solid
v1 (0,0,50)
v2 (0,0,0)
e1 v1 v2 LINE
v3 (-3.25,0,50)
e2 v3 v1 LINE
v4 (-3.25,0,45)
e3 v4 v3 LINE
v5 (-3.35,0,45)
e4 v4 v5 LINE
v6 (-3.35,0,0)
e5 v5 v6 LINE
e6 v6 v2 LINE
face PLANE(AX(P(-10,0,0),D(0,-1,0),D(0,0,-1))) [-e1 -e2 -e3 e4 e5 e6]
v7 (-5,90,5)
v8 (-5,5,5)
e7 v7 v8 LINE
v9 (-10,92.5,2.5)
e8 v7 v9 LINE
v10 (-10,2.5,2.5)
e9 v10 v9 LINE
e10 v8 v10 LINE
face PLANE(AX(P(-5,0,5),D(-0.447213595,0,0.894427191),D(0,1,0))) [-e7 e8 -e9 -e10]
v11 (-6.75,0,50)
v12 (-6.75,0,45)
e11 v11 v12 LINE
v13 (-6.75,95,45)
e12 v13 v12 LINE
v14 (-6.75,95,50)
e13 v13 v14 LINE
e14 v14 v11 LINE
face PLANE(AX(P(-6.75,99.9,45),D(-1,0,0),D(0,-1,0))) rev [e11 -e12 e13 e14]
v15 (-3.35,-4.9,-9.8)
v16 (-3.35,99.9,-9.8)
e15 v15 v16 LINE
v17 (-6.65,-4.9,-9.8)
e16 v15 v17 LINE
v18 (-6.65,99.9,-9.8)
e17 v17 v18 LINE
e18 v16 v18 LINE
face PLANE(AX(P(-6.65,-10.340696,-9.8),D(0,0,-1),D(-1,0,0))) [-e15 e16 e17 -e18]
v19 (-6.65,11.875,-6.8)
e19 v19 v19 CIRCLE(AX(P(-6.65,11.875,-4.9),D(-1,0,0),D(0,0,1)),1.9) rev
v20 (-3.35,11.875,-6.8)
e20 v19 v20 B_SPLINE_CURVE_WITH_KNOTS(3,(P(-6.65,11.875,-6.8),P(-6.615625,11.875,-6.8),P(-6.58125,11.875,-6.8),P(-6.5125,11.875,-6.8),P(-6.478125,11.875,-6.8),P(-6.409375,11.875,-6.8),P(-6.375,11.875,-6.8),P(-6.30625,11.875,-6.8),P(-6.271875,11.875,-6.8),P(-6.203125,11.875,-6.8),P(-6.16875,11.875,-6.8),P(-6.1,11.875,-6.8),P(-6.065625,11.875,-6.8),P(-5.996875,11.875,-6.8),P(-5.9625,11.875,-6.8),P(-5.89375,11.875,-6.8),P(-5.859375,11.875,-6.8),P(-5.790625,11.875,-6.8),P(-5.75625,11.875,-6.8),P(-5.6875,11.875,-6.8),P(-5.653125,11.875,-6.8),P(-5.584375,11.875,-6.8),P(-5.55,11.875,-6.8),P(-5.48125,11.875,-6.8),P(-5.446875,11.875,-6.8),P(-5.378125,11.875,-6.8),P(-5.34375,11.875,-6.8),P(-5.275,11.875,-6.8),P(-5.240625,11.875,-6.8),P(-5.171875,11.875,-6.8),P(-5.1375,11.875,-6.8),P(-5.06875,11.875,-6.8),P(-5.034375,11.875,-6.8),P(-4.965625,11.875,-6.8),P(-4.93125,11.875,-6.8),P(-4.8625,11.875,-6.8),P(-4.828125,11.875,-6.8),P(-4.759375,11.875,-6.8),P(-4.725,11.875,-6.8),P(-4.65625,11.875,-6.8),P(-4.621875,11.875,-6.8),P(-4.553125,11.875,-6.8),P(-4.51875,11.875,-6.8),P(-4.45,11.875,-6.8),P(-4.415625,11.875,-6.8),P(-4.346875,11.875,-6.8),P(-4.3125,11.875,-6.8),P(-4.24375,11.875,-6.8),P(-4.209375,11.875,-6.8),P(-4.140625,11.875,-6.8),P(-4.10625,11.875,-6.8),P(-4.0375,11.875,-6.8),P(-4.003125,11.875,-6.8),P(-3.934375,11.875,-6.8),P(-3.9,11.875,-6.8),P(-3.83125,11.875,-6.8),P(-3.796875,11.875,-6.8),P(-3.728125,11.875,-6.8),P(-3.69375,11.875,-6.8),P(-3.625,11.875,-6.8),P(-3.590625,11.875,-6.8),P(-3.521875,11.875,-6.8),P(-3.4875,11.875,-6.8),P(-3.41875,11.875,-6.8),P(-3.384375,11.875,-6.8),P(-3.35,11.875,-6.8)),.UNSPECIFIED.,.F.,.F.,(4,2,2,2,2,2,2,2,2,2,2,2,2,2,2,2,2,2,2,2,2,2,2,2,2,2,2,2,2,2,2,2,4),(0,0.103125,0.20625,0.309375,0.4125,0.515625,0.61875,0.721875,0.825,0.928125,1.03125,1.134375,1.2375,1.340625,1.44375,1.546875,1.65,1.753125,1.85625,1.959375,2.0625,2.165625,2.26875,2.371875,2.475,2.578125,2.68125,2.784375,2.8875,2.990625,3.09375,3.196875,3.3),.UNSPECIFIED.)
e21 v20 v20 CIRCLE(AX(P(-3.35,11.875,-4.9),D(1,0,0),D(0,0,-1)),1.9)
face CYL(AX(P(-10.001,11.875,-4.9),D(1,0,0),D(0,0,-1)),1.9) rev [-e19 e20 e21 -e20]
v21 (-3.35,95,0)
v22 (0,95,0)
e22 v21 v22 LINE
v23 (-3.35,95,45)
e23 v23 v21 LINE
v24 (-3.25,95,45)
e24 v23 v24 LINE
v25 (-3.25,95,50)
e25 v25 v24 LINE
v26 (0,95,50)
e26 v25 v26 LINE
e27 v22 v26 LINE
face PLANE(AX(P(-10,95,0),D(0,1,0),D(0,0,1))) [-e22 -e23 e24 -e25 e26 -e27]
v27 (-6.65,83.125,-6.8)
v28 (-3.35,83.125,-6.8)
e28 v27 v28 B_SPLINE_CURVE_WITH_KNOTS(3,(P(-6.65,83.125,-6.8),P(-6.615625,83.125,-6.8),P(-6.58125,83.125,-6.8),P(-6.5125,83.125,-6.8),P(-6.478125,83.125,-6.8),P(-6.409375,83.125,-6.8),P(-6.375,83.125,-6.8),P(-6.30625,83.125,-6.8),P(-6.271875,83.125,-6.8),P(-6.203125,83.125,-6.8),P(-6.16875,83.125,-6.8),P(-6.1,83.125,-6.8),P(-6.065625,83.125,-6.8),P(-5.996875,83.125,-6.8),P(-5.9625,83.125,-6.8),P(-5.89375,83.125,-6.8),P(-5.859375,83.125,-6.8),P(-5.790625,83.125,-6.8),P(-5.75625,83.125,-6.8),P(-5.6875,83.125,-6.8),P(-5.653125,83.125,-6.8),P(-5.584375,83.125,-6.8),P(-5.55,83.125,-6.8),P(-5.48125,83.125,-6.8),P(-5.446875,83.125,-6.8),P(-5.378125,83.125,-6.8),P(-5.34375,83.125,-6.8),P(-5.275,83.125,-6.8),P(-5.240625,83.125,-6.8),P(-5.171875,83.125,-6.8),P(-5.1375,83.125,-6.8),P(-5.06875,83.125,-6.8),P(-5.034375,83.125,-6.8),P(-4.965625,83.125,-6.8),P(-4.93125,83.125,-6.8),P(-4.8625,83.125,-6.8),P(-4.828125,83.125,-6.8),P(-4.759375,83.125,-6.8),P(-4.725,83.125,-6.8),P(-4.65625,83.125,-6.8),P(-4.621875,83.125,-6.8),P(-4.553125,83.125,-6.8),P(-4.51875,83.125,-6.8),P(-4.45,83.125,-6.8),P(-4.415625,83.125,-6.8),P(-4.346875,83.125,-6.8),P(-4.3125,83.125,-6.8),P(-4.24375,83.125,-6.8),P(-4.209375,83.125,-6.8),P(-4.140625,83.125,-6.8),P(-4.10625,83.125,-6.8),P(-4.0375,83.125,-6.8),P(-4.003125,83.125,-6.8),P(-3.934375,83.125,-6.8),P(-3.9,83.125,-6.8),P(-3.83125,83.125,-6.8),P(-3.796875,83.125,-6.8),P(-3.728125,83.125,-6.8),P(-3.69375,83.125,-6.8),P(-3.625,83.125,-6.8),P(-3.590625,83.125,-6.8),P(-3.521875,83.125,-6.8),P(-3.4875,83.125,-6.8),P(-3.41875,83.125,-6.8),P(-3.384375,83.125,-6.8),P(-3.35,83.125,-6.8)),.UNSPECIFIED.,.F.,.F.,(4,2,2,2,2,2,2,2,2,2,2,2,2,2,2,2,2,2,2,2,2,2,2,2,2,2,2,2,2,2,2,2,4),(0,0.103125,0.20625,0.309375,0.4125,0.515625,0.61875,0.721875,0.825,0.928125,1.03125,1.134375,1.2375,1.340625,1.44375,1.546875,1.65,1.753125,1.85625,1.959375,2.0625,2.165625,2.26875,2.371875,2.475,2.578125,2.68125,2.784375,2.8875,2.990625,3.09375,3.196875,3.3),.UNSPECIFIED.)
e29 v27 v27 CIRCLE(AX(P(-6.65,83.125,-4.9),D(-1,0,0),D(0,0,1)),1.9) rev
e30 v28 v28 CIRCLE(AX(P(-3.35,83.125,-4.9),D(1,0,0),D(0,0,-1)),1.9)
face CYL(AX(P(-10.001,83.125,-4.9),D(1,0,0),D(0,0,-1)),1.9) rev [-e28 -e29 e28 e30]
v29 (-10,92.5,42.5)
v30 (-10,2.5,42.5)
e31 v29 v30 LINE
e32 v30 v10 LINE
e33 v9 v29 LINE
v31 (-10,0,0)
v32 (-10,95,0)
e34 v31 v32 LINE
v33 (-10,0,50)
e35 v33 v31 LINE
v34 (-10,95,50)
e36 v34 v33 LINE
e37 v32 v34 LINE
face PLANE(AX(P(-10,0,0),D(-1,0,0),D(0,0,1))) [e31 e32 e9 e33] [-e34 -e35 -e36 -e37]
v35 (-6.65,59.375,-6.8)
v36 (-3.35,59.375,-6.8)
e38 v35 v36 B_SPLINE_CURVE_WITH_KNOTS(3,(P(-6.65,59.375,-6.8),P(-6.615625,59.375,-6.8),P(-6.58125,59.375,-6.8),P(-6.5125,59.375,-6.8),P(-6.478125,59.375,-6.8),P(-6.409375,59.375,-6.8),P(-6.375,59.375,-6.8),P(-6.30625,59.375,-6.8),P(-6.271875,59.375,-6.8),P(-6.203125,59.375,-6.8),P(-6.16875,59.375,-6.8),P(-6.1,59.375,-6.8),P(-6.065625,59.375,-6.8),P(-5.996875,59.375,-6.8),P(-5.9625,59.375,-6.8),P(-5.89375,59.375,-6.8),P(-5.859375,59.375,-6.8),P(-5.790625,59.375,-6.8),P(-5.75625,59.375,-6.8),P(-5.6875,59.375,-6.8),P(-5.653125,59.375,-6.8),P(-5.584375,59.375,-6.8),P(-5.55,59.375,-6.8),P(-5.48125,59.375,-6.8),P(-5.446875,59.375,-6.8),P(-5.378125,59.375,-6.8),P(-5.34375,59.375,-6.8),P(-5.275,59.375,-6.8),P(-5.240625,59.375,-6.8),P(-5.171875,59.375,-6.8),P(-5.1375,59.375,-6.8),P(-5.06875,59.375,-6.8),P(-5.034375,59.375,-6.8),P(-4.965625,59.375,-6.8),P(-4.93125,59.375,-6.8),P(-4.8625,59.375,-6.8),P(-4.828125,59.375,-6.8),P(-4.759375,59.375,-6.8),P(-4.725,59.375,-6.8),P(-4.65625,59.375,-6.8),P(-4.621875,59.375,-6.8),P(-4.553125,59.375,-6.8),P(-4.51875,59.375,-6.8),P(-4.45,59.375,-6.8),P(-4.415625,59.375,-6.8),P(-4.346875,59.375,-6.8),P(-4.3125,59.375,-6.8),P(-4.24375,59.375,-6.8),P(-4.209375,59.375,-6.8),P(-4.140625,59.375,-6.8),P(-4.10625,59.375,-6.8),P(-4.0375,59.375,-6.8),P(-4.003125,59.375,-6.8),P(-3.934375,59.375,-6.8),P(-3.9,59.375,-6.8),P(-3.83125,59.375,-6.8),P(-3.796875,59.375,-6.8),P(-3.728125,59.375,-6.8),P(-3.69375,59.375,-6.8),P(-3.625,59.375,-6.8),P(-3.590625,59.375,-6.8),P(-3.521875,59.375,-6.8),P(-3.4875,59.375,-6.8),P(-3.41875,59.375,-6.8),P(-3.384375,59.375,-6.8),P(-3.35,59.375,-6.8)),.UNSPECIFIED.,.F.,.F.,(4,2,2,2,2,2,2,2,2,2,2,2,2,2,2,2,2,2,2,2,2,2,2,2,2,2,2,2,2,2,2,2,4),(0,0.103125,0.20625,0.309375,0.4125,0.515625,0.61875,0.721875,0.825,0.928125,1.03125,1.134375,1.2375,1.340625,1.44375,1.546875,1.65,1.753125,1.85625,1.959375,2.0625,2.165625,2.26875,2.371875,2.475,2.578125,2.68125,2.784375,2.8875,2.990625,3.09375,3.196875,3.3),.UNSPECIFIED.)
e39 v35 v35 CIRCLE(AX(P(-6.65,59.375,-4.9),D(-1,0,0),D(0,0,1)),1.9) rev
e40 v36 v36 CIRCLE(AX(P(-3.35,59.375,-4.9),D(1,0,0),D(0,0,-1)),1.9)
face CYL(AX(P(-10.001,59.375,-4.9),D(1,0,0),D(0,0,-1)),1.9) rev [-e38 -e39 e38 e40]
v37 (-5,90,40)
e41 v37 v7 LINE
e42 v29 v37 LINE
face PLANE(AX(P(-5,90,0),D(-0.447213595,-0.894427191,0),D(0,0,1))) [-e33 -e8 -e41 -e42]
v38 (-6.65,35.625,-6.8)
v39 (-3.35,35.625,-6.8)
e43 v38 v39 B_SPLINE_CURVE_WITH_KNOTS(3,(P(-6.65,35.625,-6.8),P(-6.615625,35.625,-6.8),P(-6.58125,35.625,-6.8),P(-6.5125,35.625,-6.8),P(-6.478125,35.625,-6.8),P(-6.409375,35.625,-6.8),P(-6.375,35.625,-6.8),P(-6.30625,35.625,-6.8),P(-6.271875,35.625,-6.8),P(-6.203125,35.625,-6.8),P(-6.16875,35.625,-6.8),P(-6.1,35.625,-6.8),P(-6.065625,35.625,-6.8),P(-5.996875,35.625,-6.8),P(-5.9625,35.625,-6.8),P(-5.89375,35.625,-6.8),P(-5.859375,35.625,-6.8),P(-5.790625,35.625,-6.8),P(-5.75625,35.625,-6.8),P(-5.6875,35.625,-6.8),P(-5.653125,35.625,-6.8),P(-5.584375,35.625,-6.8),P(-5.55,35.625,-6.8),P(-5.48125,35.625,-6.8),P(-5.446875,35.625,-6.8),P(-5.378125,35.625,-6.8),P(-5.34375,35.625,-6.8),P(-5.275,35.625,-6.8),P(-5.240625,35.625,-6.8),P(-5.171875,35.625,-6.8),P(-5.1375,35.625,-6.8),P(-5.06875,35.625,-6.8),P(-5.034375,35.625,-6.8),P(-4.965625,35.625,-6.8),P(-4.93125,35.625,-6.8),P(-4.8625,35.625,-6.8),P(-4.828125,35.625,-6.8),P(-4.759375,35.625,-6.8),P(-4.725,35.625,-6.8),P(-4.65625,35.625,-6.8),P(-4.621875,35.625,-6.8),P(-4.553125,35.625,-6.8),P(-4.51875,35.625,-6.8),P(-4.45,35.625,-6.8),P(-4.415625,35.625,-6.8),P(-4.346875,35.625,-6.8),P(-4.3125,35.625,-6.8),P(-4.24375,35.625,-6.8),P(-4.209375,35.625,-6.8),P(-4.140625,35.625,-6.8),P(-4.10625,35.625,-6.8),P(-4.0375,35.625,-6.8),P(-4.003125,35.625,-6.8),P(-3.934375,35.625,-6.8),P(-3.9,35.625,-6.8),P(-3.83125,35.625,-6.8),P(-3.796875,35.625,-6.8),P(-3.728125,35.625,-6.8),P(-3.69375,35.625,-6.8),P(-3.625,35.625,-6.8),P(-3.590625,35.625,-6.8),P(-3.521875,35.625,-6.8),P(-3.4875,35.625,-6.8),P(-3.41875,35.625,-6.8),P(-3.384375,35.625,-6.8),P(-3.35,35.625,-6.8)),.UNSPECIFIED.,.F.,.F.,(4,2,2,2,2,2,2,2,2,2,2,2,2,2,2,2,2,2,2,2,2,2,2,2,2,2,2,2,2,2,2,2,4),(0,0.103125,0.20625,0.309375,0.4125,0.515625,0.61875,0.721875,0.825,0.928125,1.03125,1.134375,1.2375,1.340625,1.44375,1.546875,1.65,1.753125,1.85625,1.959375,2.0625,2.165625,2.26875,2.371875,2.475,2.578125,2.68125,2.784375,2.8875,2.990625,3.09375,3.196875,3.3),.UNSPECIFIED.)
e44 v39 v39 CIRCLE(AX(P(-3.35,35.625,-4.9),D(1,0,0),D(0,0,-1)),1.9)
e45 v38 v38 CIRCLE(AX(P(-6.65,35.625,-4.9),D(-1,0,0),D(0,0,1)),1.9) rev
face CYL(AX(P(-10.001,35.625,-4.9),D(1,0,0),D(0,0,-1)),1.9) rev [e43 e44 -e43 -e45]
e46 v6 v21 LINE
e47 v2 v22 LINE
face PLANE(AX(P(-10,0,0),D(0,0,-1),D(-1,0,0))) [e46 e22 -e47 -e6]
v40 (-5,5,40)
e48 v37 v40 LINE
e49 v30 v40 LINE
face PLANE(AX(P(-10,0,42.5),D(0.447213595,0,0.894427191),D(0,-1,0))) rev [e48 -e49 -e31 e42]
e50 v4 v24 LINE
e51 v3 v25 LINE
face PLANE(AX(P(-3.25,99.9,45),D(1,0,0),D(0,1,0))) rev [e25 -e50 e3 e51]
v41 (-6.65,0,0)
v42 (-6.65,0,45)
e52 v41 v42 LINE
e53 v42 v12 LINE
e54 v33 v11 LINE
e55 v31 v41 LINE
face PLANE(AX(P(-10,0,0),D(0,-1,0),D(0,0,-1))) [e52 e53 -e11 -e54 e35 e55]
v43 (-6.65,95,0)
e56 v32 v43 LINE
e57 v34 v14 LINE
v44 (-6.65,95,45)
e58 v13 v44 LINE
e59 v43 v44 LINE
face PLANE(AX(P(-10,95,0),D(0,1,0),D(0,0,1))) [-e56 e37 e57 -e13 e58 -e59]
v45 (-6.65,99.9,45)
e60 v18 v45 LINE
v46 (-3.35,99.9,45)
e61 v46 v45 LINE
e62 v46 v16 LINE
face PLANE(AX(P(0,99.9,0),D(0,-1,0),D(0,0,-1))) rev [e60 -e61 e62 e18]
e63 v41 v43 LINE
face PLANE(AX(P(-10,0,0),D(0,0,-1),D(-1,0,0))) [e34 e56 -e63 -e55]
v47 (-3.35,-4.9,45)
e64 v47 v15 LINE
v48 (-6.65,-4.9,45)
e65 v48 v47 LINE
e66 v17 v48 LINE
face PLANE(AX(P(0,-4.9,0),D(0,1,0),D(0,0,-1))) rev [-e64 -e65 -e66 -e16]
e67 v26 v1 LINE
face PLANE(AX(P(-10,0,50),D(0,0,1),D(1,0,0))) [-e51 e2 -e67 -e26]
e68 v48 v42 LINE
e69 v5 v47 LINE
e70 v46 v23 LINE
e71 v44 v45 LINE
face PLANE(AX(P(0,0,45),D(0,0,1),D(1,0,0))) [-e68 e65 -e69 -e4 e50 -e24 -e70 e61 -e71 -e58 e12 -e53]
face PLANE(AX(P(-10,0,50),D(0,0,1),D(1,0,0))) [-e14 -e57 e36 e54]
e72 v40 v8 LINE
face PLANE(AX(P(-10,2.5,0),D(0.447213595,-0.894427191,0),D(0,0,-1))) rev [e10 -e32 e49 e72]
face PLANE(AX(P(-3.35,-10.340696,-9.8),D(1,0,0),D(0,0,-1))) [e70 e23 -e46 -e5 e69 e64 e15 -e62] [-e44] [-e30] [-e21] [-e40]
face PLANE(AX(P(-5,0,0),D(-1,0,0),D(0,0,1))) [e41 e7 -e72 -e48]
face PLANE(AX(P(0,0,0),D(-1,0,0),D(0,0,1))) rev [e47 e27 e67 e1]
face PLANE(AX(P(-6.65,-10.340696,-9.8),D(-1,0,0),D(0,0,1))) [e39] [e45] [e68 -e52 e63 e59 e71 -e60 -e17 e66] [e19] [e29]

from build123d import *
from OCP.BRepFilletAPI import BRepFilletAPI_MakeChamfer

# Parameters (mm, degrees)
SKETCH2_W           = 95
SKETCH2_H           = 50
BOSS_EXTRUDE1_DEPTH = 10
SKETCH3_W           = 3.3
SKETCH3_H           = 9.8
BOSS_EXTRUDE2_DEPTH = 95
SKETCH4_W           = 3.3
SKETCH4_H           = 59.8
BOSS_EXTRUDE3_DEPTH = 4.9
CUT_EXTRUDE1_REACH  = 113.912
SKETCH5_R           = 1.9
LPATTERN1_COUNT     = 4
LPATTERN1_PITCH     = 23.75
SKETCH7_W           = 3.5
SKETCH7_H           = 104.8
CUT_EXTRUDE6_DEPTH  = 5
SKETCH8_W           = 85
SKETCH8_H           = 35
CUT_EXTRUDE7_DEPTH  = 5
CHAMFER1_SIZE       = 2.5
CHAMFER1_SIZE_2     = 5


with BuildPart() as part:
    # Sketch2 → Boss-Extrude1 (new body)
    with BuildSketch(Plane.YZ):
        with Locations((47.5, 25)):
            Rectangle(SKETCH2_W, SKETCH2_H)
    extrude(amount=-BOSS_EXTRUDE1_DEPTH)

    # Sketch3 → Boss-Extrude2 (add)
    with BuildSketch(Plane(origin=(0, 95, 0), x_dir=(-1, 0, 0), z_dir=(0, 1, 0))):
        with Locations((5, -4.9)):
            Rectangle(SKETCH3_W, SKETCH3_H)
    extrude(amount=-BOSS_EXTRUDE2_DEPTH)

    # Sketch4 → Boss-Extrude3 (add)
    with BuildSketch(Plane(origin=(0, 95, 0), x_dir=(-1, 0, 0), z_dir=(0, 1, 0))):
        with Locations((5, 20.1)):
            Rectangle(SKETCH4_W, SKETCH4_H)
    boss_extrude3 = extrude(amount=BOSS_EXTRUDE3_DEPTH)

    # Mirror1: Boss-Extrude3 across plane
    add(boss_extrude3.mirror(Plane.ZX.offset(47.5)))

    # Sketch5 → Cut-Extrude1 (cut, up to next)
    with BuildSketch(Plane.YZ.offset(-3.35), mode=Mode.PRIVATE) as cut_extrude1_sk1:
        with Locations(Location((11.875, -4.9, 0), (0, 0, 270))):
            Circle(SKETCH5_R)
    cut_extrude1_tool1 = extrude(cut_extrude1_sk1.sketch, amount=-CUT_EXTRUDE1_REACH, mode=Mode.PRIVATE) & part.part
    cut_extrude1 = cut_extrude1_tool1.solids().sort_by_distance((-3.35, 11.875, -4.9))[0]
    add(cut_extrude1, mode=Mode.SUBTRACT)

    # LPattern1: Cut-Extrude1 ×4
    with Locations(*[(0, i * LPATTERN1_PITCH, 0) for i in range(1, LPATTERN1_COUNT)]):
        add(cut_extrude1, mode=Mode.SUBTRACT)

    # Sketch7 → Cut-Extrude6 (cut)
    with BuildSketch(Plane.XY.offset(50)):
        with Locations((-5, 47.5)):
            Rectangle(SKETCH7_W, SKETCH7_H)
    extrude(amount=-CUT_EXTRUDE6_DEPTH, mode=Mode.SUBTRACT)

    # Sketch8 → Cut-Extrude7 (cut)
    with BuildSketch(Plane(origin=(-10, 0, 0), x_dir=(0, -1, 0), z_dir=(-1, 0, 0))):
        with Locations((-47.5, 22.5)):
            Rectangle(SKETCH8_W, SKETCH8_H)
    extrude(amount=-CUT_EXTRUDE7_DEPTH, mode=Mode.SUBTRACT)

    # Chamfer1
    chamfer1_edges_1 = [part.edges().sort_by_distance(p)[0] for p in [
        (-10, 5, 22.5),
    ]]
    chamfer1_side_1 = [part.faces().sort_by_distance(p)[0] for p in [
        (-10, 4.95, 22.5),
    ]]
    chamfer1_edges_2 = [part.edges().sort_by_distance(p)[0] for p in [
        (-10, 47.5, 5),
    ]]
    chamfer1_side_2 = [part.faces().sort_by_distance(p)[0] for p in [
        (-10, 47.5, 4.95),
    ]]
    chamfer1_edges_3 = [part.edges().sort_by_distance(p)[0] for p in [
        (-10, 90, 22.5),
    ]]
    chamfer1_side_3 = [part.faces().sort_by_distance(p)[0] for p in [
        (-10, 90.05, 22.5),
    ]]
    chamfer1_edges_4 = [part.edges().sort_by_distance(p)[0] for p in [
        (-10, 47.5, 40),
    ]]
    chamfer1_side_4 = [part.faces().sort_by_distance(p)[0] for p in [
        (-10, 47.5, 40.05),
    ]]
    chamfer1 = BRepFilletAPI_MakeChamfer(part.part.solid().wrapped)
    for e in chamfer1_edges_1:
        chamfer1.Add(CHAMFER1_SIZE - 0.0001, CHAMFER1_SIZE_2 - 0.0001, e.wrapped, chamfer1_side_1[0].wrapped)
    for e in chamfer1_edges_2:
        chamfer1.Add(CHAMFER1_SIZE - 0.0001, CHAMFER1_SIZE_2 - 0.0001, e.wrapped, chamfer1_side_2[0].wrapped)
    for e in chamfer1_edges_3:
        chamfer1.Add(CHAMFER1_SIZE - 0.0001, CHAMFER1_SIZE_2 - 0.0001, e.wrapped, chamfer1_side_3[0].wrapped)
    for e in chamfer1_edges_4:
        chamfer1.Add(CHAMFER1_SIZE - 0.0001, CHAMFER1_SIZE_2 - 0.0001, e.wrapped, chamfer1_side_4[0].wrapped)
    add(Compound.cast(chamfer1.Shape()), mode=Mode.REPLACE)  # a hair under: the kernel refuses the full size


solid = part.part
